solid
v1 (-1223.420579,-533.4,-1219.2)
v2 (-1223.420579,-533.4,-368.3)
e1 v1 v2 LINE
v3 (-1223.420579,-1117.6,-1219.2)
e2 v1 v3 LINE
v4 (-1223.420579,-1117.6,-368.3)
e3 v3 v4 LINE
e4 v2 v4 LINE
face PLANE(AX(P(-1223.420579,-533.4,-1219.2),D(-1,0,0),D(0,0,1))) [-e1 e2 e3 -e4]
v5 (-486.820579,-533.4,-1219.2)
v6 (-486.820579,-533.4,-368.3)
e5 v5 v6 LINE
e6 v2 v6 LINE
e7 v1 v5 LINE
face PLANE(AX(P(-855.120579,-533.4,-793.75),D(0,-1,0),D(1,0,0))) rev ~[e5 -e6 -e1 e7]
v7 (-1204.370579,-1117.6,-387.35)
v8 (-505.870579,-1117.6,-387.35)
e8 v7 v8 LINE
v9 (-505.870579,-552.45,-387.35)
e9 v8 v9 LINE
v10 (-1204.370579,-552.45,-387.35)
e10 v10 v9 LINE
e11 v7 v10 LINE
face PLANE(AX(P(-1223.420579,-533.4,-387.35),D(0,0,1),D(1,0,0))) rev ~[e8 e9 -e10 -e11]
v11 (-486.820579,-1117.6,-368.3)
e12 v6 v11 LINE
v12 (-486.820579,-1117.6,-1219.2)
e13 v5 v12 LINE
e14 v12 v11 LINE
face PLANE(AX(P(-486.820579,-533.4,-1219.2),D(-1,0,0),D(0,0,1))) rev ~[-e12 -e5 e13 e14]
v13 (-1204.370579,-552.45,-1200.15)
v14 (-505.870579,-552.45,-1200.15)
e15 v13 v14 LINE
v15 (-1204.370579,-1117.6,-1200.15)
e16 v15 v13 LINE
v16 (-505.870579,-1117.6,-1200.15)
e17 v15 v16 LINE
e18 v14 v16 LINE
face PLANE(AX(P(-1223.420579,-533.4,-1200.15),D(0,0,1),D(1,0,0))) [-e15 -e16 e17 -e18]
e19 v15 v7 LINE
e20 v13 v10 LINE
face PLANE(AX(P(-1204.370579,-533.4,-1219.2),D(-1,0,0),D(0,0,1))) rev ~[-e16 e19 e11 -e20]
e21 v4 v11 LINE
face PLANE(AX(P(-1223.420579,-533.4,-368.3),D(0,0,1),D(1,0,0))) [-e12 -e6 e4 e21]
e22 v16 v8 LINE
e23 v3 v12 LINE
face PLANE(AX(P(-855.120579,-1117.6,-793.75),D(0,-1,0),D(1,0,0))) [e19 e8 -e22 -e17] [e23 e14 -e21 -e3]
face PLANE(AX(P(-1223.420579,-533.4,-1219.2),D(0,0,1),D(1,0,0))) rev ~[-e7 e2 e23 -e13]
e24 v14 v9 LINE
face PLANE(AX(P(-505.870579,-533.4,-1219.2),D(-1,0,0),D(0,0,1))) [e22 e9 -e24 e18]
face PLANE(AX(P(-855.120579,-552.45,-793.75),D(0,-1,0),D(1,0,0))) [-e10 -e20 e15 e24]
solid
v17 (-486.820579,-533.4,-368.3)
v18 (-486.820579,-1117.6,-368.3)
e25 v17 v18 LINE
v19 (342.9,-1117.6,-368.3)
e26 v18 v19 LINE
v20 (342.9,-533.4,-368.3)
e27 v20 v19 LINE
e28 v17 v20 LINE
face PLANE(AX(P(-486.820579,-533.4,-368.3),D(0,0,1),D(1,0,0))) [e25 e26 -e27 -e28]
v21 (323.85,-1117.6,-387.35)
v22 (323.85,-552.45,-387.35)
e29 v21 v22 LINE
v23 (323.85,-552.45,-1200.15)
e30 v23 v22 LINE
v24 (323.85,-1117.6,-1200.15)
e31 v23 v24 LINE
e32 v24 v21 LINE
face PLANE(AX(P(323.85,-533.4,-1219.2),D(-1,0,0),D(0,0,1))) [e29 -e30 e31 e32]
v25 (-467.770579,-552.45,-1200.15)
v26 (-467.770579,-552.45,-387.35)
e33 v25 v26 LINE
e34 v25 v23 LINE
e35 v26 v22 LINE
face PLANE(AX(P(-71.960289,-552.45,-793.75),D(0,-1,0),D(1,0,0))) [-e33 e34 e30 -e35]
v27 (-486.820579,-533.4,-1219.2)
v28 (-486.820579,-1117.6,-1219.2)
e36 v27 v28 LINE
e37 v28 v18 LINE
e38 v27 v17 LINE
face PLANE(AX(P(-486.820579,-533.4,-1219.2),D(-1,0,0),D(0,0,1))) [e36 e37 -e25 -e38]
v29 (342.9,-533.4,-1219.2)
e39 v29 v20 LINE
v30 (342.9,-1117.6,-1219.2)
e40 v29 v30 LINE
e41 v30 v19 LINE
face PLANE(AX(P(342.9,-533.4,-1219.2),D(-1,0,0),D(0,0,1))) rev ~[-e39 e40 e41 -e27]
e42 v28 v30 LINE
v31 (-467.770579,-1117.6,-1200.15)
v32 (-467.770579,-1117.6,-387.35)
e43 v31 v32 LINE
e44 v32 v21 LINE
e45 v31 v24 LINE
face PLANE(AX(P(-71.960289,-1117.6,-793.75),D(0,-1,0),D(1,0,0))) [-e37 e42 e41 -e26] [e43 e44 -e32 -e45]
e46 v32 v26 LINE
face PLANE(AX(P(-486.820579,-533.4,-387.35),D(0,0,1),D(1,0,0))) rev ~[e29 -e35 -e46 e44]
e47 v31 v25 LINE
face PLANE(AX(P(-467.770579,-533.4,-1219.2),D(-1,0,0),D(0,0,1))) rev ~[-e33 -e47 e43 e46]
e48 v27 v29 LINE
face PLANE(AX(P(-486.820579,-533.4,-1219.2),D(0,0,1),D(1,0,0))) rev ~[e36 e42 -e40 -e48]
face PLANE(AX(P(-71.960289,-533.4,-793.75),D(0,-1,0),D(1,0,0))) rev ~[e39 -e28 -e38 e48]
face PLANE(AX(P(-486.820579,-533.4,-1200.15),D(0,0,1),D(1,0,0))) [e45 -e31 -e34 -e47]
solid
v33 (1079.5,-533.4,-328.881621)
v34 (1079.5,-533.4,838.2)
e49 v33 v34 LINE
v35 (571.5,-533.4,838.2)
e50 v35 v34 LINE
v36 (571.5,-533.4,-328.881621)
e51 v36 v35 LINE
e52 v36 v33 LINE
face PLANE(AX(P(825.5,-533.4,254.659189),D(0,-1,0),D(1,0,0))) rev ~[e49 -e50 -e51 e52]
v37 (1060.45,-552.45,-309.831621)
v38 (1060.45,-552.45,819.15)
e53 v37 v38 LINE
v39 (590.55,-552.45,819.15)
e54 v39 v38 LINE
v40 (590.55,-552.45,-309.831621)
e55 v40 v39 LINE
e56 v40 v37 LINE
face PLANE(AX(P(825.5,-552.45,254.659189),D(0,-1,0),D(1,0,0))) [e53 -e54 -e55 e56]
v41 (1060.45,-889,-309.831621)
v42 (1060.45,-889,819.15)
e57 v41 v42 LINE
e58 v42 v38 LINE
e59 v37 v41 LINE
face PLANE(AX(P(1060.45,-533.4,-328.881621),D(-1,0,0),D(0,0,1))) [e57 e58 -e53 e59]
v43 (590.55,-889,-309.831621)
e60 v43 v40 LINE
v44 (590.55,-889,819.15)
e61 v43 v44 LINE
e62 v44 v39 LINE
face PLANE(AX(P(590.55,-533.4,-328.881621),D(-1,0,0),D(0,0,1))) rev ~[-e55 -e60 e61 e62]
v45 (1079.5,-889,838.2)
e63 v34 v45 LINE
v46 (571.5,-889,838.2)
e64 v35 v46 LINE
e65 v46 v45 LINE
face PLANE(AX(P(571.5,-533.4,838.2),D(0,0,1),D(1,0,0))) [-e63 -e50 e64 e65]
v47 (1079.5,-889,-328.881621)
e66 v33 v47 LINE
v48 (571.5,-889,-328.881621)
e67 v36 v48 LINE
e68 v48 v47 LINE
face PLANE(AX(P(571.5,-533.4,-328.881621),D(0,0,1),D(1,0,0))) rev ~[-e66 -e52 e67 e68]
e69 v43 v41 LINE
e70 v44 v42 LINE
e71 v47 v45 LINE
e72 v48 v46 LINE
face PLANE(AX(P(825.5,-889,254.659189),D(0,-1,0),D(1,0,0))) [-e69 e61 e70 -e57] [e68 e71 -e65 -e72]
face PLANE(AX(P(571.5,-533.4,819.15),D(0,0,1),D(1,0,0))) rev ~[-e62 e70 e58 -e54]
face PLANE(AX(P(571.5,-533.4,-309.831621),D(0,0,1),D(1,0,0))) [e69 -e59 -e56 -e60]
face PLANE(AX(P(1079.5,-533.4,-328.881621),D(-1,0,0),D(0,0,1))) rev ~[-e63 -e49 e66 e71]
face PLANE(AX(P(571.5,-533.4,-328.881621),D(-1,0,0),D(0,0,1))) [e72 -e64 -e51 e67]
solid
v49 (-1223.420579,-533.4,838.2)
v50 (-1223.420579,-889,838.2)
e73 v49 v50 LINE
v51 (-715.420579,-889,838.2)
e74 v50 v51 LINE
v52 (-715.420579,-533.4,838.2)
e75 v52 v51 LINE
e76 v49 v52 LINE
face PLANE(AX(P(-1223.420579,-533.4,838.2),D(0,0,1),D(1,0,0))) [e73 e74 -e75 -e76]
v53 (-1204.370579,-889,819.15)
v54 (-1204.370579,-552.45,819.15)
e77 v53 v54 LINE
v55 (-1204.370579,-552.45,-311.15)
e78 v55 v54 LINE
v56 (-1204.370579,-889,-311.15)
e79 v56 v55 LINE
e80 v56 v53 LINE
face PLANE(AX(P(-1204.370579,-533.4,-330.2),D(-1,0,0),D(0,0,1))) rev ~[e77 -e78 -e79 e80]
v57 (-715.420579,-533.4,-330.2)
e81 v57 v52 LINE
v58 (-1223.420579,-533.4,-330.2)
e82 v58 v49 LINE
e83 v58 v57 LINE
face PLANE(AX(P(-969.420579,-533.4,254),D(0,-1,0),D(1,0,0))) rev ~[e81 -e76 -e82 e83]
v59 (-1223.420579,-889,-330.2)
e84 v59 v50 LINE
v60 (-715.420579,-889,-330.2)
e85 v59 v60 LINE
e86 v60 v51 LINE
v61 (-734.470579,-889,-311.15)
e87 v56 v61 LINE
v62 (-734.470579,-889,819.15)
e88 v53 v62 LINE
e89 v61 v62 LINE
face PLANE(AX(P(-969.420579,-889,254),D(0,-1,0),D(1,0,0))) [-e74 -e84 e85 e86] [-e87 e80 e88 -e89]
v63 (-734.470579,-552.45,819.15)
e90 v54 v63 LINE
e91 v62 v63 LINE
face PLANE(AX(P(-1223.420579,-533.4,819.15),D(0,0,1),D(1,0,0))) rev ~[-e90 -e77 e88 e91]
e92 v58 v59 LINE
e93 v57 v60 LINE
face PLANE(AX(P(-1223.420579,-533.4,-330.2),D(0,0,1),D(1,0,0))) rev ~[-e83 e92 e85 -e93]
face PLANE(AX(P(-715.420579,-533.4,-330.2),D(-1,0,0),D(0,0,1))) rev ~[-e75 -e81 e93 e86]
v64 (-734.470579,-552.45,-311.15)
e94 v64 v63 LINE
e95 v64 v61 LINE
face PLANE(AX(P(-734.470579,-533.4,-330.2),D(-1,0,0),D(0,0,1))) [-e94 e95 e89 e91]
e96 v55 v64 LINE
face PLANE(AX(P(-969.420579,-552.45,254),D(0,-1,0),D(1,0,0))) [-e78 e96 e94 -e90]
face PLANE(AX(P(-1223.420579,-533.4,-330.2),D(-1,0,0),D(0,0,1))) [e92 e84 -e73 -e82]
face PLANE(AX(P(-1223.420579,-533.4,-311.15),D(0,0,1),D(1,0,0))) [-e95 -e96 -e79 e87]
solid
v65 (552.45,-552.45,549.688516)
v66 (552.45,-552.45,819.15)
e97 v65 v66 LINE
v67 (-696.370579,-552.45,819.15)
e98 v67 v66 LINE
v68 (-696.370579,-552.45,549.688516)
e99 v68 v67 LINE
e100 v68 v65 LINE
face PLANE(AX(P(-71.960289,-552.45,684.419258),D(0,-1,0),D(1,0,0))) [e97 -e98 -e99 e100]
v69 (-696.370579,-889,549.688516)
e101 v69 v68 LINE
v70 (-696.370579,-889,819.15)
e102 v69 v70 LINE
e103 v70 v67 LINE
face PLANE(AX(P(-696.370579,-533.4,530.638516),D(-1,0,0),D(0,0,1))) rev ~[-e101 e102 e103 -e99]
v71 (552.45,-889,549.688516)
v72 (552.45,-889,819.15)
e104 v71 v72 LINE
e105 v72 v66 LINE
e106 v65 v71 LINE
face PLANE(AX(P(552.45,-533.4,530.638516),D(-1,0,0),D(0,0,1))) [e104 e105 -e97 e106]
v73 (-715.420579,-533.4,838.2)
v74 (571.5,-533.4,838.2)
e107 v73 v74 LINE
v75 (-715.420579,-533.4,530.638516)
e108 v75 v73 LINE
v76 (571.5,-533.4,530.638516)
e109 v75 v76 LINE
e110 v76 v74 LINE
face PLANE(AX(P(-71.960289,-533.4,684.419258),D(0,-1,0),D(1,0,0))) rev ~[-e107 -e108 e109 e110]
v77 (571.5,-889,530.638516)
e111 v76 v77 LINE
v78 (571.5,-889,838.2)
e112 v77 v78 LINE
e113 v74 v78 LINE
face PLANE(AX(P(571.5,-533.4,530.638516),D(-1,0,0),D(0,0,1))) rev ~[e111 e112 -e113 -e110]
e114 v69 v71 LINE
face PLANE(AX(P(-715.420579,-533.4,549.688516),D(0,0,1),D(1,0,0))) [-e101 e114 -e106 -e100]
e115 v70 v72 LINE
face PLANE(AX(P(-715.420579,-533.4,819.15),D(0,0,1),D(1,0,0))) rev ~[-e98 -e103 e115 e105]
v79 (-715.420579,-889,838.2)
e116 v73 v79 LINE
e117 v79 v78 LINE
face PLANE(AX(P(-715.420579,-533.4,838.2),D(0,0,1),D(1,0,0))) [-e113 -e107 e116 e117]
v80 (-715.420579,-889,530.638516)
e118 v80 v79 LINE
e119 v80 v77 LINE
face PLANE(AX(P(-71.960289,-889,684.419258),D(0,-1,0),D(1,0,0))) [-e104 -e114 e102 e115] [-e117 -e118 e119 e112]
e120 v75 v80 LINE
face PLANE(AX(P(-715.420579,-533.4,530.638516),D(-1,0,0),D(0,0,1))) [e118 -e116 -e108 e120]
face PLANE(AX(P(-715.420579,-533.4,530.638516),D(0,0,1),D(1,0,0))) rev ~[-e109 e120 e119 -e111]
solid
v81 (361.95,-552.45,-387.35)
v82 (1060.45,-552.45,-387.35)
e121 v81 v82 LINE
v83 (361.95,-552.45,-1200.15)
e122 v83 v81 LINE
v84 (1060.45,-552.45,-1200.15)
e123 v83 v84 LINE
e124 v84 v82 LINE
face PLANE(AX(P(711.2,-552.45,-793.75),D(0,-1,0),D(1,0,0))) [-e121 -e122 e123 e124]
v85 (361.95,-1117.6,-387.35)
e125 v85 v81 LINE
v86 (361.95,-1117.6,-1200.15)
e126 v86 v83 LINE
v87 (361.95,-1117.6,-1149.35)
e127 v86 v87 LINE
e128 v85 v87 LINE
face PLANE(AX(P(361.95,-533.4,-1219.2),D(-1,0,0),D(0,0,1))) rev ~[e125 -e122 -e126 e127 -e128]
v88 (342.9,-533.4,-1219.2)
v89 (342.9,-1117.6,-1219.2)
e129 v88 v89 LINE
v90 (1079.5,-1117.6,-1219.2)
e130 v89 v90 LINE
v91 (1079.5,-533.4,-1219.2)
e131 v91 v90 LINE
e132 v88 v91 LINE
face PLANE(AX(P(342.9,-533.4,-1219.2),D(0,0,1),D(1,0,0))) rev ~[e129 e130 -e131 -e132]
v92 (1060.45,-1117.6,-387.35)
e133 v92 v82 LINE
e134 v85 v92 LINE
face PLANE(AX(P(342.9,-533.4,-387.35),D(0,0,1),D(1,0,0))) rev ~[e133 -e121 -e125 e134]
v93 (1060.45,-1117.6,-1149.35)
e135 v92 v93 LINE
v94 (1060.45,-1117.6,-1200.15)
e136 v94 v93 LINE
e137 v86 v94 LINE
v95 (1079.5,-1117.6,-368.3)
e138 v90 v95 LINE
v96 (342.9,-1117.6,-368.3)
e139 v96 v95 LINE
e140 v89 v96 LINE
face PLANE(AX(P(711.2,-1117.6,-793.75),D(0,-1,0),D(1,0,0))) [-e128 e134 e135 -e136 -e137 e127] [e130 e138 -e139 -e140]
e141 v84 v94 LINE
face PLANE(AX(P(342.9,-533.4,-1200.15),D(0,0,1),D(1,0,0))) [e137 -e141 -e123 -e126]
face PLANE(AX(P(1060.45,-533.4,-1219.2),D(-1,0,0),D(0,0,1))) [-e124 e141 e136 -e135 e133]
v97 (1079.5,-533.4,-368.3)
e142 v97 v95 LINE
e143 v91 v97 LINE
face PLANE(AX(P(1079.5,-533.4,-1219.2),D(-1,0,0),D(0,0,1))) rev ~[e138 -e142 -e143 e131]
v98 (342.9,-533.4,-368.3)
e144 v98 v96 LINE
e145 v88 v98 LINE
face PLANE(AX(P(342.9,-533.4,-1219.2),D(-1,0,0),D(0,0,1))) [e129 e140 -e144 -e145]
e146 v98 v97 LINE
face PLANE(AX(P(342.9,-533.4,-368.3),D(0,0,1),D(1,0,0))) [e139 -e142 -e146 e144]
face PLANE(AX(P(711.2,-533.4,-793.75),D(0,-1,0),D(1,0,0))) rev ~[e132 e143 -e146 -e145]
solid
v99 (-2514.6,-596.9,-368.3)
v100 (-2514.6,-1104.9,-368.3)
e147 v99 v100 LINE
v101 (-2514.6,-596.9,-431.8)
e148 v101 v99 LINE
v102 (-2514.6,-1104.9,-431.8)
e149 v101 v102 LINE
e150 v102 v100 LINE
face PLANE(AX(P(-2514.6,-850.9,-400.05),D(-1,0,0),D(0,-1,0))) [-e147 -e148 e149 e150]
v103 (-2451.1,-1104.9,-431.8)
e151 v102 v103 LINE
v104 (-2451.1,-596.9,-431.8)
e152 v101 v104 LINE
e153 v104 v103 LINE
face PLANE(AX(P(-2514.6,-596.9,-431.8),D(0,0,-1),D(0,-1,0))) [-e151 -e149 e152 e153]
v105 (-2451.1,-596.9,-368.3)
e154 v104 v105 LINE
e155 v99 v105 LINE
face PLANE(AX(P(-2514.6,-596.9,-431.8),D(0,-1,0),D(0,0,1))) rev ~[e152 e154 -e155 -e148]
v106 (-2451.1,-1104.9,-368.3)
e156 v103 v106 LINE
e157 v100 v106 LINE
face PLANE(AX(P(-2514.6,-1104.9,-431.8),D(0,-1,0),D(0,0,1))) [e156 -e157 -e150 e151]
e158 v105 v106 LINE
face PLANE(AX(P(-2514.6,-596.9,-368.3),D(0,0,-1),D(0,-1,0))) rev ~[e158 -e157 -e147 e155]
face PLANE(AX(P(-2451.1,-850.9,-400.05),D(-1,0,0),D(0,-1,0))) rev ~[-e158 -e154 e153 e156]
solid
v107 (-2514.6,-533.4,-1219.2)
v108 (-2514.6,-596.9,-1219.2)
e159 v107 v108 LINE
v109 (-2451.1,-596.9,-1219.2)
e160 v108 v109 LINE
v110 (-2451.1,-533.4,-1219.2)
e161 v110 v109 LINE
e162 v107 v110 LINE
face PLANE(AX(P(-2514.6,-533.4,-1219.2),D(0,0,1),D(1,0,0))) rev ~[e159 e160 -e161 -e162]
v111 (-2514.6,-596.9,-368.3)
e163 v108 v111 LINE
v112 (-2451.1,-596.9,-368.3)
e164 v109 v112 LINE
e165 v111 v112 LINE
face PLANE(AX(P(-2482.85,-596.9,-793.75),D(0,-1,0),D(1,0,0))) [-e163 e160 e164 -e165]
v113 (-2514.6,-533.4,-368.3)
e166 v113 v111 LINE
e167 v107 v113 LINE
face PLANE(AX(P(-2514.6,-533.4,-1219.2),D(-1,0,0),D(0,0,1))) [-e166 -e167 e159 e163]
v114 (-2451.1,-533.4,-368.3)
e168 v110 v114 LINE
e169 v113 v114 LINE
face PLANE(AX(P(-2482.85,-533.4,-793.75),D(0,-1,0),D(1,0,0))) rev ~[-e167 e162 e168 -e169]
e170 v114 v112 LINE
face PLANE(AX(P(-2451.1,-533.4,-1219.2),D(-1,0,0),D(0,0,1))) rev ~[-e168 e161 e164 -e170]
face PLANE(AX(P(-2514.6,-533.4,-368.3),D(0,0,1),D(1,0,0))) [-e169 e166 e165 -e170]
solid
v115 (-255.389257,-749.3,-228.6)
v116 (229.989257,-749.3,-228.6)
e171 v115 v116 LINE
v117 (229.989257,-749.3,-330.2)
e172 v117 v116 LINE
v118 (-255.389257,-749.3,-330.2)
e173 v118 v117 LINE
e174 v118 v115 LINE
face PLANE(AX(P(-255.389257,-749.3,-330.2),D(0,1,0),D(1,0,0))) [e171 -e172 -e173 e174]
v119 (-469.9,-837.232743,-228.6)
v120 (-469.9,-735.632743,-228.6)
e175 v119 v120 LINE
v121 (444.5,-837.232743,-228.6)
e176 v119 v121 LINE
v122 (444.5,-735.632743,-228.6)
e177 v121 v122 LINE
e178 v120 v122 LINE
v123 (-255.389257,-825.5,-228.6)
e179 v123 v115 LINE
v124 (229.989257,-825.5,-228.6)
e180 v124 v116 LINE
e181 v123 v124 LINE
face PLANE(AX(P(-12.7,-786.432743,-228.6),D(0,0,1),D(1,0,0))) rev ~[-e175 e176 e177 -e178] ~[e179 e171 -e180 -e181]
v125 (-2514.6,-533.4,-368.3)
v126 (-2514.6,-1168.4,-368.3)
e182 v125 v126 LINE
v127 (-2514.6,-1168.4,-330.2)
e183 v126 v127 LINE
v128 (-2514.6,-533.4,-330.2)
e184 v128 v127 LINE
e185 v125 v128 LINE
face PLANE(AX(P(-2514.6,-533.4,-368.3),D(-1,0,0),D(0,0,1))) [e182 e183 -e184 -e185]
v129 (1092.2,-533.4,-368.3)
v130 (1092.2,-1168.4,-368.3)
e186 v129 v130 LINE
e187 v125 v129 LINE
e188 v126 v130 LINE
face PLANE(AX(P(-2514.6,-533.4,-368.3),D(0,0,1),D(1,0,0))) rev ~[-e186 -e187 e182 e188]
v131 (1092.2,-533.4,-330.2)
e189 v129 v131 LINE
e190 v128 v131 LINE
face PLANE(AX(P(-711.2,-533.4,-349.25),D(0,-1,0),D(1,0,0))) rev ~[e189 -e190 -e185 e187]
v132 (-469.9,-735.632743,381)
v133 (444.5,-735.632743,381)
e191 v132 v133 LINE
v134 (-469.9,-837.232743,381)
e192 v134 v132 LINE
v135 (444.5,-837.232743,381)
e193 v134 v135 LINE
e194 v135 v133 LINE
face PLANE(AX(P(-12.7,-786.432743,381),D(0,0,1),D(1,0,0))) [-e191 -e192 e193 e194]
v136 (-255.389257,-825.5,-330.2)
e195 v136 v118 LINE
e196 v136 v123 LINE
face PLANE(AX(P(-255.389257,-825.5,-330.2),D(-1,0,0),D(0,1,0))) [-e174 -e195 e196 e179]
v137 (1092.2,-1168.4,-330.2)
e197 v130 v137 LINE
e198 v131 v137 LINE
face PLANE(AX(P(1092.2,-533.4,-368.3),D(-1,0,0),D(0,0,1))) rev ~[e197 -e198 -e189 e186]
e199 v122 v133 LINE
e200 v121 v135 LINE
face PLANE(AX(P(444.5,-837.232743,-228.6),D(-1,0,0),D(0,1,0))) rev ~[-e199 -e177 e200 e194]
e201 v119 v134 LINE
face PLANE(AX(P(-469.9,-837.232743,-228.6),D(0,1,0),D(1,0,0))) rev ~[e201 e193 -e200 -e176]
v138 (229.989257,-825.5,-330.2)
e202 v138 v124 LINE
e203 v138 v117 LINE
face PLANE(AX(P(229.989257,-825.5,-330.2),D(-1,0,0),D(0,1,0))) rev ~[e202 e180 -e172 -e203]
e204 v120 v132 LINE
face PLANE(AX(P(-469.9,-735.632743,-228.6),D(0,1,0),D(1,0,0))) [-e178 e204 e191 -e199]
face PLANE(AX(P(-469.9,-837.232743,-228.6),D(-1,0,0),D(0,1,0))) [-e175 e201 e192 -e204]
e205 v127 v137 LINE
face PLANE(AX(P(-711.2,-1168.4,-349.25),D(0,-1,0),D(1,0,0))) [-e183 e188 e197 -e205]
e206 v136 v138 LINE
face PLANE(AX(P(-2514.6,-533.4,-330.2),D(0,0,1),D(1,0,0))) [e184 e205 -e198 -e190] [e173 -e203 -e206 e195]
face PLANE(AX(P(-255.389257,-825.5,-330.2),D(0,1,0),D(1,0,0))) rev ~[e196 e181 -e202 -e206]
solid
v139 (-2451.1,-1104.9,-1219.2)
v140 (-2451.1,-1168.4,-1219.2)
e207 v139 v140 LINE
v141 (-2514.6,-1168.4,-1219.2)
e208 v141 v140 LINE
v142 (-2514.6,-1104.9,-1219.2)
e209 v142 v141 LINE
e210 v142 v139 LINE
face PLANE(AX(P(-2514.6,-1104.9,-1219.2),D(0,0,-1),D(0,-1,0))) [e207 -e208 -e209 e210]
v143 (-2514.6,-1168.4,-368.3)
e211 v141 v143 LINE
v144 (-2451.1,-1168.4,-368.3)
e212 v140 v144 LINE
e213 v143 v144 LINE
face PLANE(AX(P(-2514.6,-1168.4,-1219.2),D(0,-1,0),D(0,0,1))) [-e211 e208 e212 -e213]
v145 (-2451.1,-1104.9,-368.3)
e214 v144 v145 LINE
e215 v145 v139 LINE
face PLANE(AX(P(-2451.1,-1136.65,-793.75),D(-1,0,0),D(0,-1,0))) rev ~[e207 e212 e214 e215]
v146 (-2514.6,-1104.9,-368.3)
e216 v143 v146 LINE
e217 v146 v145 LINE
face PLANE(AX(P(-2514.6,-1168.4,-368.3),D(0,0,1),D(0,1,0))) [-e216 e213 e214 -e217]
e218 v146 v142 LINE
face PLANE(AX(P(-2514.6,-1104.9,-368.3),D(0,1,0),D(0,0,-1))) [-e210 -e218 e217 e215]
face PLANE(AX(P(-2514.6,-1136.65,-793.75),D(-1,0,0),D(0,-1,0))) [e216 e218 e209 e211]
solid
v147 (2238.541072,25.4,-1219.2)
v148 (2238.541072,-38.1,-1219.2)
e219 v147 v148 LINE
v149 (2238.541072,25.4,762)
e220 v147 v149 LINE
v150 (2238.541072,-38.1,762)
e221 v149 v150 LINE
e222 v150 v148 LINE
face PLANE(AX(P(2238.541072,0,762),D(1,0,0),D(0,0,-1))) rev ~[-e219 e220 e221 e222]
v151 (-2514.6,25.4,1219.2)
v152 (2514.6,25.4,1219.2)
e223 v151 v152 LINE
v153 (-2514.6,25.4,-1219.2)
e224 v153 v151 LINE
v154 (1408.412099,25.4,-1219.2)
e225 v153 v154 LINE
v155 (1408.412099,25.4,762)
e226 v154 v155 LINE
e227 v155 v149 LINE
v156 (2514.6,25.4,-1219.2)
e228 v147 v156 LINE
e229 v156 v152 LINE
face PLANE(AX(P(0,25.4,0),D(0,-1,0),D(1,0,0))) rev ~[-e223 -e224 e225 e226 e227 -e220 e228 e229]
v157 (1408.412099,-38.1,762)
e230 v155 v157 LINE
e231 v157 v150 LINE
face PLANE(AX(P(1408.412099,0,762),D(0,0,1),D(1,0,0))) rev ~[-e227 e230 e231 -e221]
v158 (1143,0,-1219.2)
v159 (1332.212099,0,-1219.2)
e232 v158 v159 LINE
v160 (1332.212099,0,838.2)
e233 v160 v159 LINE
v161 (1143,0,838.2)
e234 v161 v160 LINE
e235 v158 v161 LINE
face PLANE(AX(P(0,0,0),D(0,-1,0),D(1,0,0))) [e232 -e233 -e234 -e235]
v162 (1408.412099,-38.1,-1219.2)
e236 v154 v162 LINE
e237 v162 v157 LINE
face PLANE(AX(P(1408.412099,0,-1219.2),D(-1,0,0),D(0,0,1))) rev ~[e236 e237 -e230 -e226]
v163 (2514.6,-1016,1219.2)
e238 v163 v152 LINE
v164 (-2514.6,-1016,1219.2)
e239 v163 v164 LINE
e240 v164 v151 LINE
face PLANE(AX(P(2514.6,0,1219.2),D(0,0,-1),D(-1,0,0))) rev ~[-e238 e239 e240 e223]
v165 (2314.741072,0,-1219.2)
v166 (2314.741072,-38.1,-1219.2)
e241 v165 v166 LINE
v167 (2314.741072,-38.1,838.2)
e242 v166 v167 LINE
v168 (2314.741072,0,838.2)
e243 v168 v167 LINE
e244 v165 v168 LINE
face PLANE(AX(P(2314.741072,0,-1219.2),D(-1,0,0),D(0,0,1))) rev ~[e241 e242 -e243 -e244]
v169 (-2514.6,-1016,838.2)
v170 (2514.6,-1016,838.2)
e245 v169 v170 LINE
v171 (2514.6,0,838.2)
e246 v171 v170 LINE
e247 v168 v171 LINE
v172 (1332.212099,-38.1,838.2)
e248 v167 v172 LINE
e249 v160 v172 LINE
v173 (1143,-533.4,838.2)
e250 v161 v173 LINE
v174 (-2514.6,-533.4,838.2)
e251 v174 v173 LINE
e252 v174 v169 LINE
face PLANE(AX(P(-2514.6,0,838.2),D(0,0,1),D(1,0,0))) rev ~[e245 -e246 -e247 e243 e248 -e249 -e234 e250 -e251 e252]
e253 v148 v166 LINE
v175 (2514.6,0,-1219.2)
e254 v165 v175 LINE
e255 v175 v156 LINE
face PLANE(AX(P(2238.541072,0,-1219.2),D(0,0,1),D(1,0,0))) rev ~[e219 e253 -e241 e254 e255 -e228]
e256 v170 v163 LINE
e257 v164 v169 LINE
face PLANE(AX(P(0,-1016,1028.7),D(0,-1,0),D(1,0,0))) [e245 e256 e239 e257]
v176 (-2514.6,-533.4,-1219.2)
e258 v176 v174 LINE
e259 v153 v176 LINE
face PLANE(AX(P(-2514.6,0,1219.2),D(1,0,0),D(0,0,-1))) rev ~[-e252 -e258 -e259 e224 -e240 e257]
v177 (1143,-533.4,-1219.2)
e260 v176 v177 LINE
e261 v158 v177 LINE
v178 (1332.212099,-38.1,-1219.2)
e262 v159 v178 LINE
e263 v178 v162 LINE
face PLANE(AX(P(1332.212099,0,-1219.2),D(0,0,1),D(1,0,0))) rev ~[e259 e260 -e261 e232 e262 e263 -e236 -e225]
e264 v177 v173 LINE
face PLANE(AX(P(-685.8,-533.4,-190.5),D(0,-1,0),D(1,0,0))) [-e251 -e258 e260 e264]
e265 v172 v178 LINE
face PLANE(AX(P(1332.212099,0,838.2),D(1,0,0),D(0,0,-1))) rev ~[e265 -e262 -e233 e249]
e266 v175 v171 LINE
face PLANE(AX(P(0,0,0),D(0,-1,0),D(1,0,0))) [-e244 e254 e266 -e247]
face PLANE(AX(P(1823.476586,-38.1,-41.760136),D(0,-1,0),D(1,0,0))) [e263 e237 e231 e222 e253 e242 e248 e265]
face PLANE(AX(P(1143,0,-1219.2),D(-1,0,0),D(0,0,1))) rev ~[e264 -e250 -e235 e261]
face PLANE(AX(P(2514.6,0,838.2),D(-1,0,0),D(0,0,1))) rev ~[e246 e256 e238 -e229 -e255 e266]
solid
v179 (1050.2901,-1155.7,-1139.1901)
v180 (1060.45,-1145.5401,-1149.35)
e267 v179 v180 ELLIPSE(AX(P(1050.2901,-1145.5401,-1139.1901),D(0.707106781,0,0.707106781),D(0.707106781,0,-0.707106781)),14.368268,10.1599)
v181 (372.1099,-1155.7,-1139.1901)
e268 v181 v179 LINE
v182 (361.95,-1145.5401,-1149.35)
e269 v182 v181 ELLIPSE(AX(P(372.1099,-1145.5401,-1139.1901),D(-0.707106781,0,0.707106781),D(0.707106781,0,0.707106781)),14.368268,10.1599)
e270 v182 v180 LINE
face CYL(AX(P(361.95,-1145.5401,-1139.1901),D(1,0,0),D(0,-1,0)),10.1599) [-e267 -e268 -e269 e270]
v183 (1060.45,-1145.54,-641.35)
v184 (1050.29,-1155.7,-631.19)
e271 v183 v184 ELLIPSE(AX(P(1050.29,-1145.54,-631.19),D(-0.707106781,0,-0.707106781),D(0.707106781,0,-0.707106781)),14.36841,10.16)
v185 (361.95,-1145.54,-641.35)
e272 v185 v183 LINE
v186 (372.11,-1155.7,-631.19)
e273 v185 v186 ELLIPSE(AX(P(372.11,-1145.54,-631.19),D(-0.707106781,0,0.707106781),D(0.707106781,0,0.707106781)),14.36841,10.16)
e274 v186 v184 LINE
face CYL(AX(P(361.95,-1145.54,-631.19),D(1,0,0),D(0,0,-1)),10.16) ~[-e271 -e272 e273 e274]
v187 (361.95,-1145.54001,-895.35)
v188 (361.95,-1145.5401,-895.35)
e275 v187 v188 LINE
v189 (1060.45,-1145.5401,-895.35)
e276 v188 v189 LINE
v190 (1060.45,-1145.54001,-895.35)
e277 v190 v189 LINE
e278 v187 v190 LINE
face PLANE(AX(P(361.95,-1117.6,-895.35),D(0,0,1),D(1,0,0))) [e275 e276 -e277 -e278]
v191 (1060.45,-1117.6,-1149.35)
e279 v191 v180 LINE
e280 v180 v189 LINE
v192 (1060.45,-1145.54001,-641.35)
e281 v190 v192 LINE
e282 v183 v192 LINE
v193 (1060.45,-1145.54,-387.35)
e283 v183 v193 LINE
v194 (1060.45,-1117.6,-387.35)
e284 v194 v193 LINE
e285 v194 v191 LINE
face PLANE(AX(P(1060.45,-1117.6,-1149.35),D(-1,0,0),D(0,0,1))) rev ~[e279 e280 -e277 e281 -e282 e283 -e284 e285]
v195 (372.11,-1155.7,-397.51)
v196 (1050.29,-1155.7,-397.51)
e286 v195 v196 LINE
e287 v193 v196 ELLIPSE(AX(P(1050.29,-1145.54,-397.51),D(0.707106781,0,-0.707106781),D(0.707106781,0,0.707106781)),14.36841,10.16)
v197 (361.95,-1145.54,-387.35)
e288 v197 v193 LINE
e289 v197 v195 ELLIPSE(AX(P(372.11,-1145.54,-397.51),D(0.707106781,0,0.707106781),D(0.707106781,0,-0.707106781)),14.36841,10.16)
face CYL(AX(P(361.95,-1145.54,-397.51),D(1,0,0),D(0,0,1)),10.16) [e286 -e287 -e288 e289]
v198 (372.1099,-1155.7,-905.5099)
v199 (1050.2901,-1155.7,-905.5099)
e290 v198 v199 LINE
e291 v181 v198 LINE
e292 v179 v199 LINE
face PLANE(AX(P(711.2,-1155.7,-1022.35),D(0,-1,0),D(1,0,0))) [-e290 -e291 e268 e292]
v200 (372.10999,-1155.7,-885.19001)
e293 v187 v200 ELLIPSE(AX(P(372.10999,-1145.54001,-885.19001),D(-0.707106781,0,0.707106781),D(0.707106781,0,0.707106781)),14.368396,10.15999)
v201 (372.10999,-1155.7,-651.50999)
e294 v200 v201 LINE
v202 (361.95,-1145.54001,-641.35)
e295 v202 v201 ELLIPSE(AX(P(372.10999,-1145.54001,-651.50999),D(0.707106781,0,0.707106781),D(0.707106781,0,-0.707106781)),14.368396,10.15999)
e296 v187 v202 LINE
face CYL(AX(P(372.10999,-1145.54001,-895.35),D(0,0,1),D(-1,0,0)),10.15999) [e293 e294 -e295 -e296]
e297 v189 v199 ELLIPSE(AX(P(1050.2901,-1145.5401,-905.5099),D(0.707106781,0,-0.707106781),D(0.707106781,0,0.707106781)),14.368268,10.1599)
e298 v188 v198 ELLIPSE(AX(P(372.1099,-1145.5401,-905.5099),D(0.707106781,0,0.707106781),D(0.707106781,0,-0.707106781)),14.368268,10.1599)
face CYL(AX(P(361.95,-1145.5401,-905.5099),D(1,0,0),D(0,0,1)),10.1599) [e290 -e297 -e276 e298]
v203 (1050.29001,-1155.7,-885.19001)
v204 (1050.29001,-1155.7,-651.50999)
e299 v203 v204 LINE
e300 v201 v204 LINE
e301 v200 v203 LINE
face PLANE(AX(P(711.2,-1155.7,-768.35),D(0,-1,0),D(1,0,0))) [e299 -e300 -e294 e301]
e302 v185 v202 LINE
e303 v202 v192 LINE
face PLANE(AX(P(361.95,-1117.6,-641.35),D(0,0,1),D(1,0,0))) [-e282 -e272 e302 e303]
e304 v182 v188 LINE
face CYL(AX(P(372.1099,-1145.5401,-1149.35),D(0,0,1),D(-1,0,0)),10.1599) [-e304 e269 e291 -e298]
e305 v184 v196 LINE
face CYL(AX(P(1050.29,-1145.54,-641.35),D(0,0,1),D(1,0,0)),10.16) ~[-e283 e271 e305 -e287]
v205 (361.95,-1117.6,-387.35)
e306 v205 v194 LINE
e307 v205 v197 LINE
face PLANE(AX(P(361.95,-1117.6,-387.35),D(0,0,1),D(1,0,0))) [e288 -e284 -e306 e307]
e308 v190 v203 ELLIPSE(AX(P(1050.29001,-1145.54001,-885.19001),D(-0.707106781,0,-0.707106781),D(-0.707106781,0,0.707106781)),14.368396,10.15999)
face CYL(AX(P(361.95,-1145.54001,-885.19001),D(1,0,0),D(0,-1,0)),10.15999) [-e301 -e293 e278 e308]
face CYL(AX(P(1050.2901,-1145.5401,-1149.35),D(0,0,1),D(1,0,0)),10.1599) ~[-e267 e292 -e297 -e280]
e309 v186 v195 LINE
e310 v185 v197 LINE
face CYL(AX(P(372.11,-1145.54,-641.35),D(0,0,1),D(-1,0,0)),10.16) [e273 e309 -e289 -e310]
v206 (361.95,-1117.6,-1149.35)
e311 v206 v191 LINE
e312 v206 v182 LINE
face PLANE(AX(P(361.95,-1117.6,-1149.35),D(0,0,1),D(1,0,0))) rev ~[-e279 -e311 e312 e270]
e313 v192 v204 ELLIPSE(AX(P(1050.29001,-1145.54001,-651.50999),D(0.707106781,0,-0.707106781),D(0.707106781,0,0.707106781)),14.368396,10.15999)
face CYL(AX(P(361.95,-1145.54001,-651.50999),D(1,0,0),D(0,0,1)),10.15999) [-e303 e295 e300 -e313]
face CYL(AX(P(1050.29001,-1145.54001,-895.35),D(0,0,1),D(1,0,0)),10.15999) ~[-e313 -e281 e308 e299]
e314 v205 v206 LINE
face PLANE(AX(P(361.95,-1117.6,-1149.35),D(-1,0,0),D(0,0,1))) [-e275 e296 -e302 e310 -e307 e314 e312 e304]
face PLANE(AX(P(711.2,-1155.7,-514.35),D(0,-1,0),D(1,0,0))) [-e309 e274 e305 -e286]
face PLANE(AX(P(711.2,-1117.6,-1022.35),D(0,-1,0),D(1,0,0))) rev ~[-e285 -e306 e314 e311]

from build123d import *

# Parameters (mm, degrees)
F0_W      = 5029.2
F0_H      = 2438.4
F1_DEPTH  = 25.4
F2_W      = 3657.6
F2_H      = 2057.4
F3_DEPTH  = 533.4
F5_DEPTH  = 1016
F6_W      = 830.1289733465
F6_H      = 1981.2
F7_DEPTH  = 25.4
F9_DEPTH  = 38.1
F10_W     = 3606.8
F10_H     = 38.1
F11_DEPTH = 635
F12_W     = 63.5
F12_H     = 850.9
F13_DEPTH = 63.5
F14_W     = 508
F14_H     = 63.5
F15_DEPTH = 63.5
F17_DEPTH = 63.5
F18_W     = 736.6
F18_H     = 850.9
F19_DEPTH = 584.2
F20_T     = -19.05
F21_W     = 829.7205785751
F21_H     = 850.9
F22_DEPTH = 584.2
F23_T     = -19.05
F24_W     = 736.6
F24_H     = 850.9
F25_DEPTH = 584.2
F26_T     = -19.05
F27_W     = 698.5
F27_H     = 254
F28_DEPTH = 38.1
F29_W     = 485.3785143141
F29_H     = 76.2
F30_DEPTH = 101.6
F31_W     = 914.4
F31_H     = 101.6
F32_DEPTH = 609.6
F33_W     = 508
F33_H     = 1167.0816213608
F34_DEPTH = 355.6
F35_T     = -19.05
F36_W     = 508
F36_H     = 1168.4
F37_DEPTH = 355.6
F38_T     = -19.05
F39_W     = 1286.9205785751
F39_H     = 307.5614840508
F40_DEPTH = 355.6
F41_T     = -19.05
F42_R     = 10.16
F43_W     = 698.5
F43_H     = 254
F44_DEPTH = 38.1
F45_R     = 10.15999
F46_W     = 698.5
F46_H     = 254
F47_DEPTH = 38.1
F48_R     = 10.1599


# Not quite as in the source:
# - a fillet or chamfer is up to 0.001 mm smaller than in the source, because OpenCascade refuses the exact size


with BuildPart() as f1:
    # F0 (on Front) → F1 (new body)
    with BuildSketch(Plane.XZ):
        Rectangle(F0_W, F0_H)
    extrude(amount=-F1_DEPTH)

    # F2 (on face) → F3 (join)
    with BuildSketch(Plane.XZ):
        with Locations((-685.8, -190.5)):
            Rectangle(F2_W, F2_H)
    extrude(amount=F3_DEPTH)

    # F4 (on face) → F5 (join)
    with BuildSketch(Plane.XZ):
        Polygon((-2514.6, 1219.2), (-2514.6, 838.2), (1143, 838.2), (2514.6, 838.2), (2514.6, 1219.2), align=None)
    extrude(amount=F5_DEPTH)

    # F6 (on face) → F7 (cut)
    with BuildSketch(Plane.XZ):
        with Locations((1823.4765855578, -228.6)):
            Rectangle(F6_W, F6_H)
    extrude(amount=-F7_DEPTH, mode=Mode.SUBTRACT)

    # F8 (on face) → F9 (join)
    with BuildSketch(Plane.XZ):
        Polygon((2314.7410722311, 838.2), (1332.2120988846, 838.2), (1332.2120988846, -1219.2), (1408.4120988846, -1219.2), (1408.4120988846, 762), (2238.5410722311, 762), (2238.5410722311, -1219.2), (2314.7410722311, -1219.2), align=None)
    extrude(amount=F9_DEPTH)


with BuildPart() as f11:
    # F10 (on face) → F11 (new body)
    with BuildSketch(Plane.XZ.offset(533.4)):
        with Locations((-711.2, -349.25)):
            Rectangle(F10_W, F10_H)
    extrude(amount=F11_DEPTH)

    # F29 (on face) → F30 (join)
    with BuildSketch(Plane.XY.offset(-330.2)):
        with Locations((-12.7, -787.4)):
            Rectangle(F29_W, F29_H)
    extrude(amount=F30_DEPTH)

    # F31 (on face) → F32 (join)
    with BuildSketch(Plane.XY.offset(-228.6)):
        with Locations((-12.7, -786.4327430725)):
            Rectangle(F31_W, F31_H)
    extrude(amount=F32_DEPTH)


with BuildPart() as f13:
    # F12 (on face) → F13 (new body)
    with BuildSketch(Plane.XZ.offset(533.4)):
        with Locations((-2482.85, -793.75)):
            Rectangle(F12_W, F12_H)
    extrude(amount=F13_DEPTH)


with BuildPart() as f15:
    # F14 (on face) → F15 (new body)
    with BuildSketch(Plane(origin=(-2514.6, 0, 0), x_dir=(0, -1, 0), z_dir=(-1, 0, 0))):
        with Locations((850.9, -400.05)):
            Rectangle(F14_W, F14_H)
    extrude(amount=-F15_DEPTH)


with BuildPart() as f17:
    # F16 (on face) → F17 (new body)
    with BuildSketch(Plane(origin=(-2514.6, 0, 0), x_dir=(0, -1, 0), z_dir=(-1, 0, 0))):
        Polygon((1168.4, -368.3), (1104.9, -368.3), (1104.9, -431.8), (1104.9, -1219.2), (1168.4, -1219.2), align=None)
    extrude(amount=-F17_DEPTH)


with BuildPart() as f19:
    # F18 (on face) → F19 (new body)
    with BuildSketch(Plane.XZ.offset(533.4)):
        with Locations((711.2, -793.75)):
            Rectangle(F18_W, F18_H)
    extrude(amount=F19_DEPTH)

    # F20
    f20_openings = [f19.faces().sort_by_distance(p)[0] for p in [
        (711.2, -1117.6, -793.75),
    ]]
    offset(amount=F20_T, openings=f20_openings)



with BuildPart() as f22:
    # F21 (on face) → F22 (new body)
    with BuildSketch(Plane.XZ.offset(533.4)):
        with Locations((-71.9602892876, -793.75)):
            Rectangle(F21_W, F21_H)
    extrude(amount=F22_DEPTH)

    # F23
    f23_openings = [f22.faces().sort_by_distance(p)[0] for p in [
        (-71.960289, -1117.6, -793.75),
    ]]
    offset(amount=F23_T, openings=f23_openings)


with BuildPart() as f25:
    # F24 (on face) → F25 (new body)
    with BuildSketch(Plane.XZ.offset(533.4)):
        with Locations((-855.1205785751, -793.75)):
            Rectangle(F24_W, F24_H)
    extrude(amount=F25_DEPTH)

    # F26
    f26_openings = [f25.faces().sort_by_distance(p)[0] for p in [
        (-855.120579, -1117.6, -793.75),
    ]]
    offset(amount=F26_T, openings=f26_openings)


with BuildPart() as f28:
    # F27 (on face) → F28 (new body)
    with BuildSketch(Plane.XZ.offset(1117.6)):
        with Locations((711.2, -514.35)):
            Rectangle(F27_W, F27_H)
    extrude(amount=F28_DEPTH)

    # F42
    f42_edges = [f28.edges().sort_by_distance(p)[0] for p in [
        (711.2, -1155.7, -387.35),
        (361.95, -1155.7, -514.35),
        (711.2, -1155.7, -641.35),
        (1060.45, -1155.7, -514.35),
    ]]
    fillet(f42_edges, radius=F42_R)


with BuildPart() as f34:
    # F33 (on face) → F34 (new body)
    with BuildSketch(Plane.XZ.offset(533.4)):
        with Locations((825.5, 254.6591893196)):
            Rectangle(F33_W, F33_H)
    extrude(amount=F34_DEPTH)

    # F35
    f35_openings = [f34.faces().sort_by_distance(p)[0] for p in [
        (825.5, -889, 254.659189),
    ]]
    offset(amount=F35_T, openings=f35_openings)


with BuildPart() as f37:
    # F36 (on face) → F37 (new body)
    with BuildSketch(Plane.XZ.offset(533.4)):
        with Locations((-969.4205785751, 254)):
            Rectangle(F36_W, F36_H)
    extrude(amount=F37_DEPTH)

    # F38
    f38_openings = [f37.faces().sort_by_distance(p)[0] for p in [
        (-969.420579, -889, 254),
    ]]
    offset(amount=F38_T, openings=f38_openings)


with BuildPart() as f40:
    # F39 (on face) → F40 (new body)
    with BuildSketch(Plane.XZ.offset(533.4)):
        with Locations((-71.9602892876, 684.4192579746)):
            Rectangle(F39_W, F39_H)
    extrude(amount=F40_DEPTH)

    # F41
    f41_openings = [f40.faces().sort_by_distance(p)[0] for p in [
        (-71.960289, -889, 684.419258),
    ]]
    offset(amount=F41_T, openings=f41_openings)


with BuildPart() as f19_1:
    add(f19.part)

    add(f28.part)  # F44 merges F28
    # F43 (on face) → F44 (join)
    with BuildSketch(Plane.XZ.offset(1117.6)):
        with Locations((711.2, -768.35)):
            Rectangle(F43_W, F43_H)
    extrude(amount=F44_DEPTH)

    # F45 (radius 10.16 in the source; OpenCascade refuses exactly that, so slightly less here)
    f45_edges = [f19_1.edges().sort_by_distance(p)[0] for p in [
        (1060.45, -1155.7, -768.35),
        (711.2, -1155.7, -641.35),
        (361.95, -1155.7, -768.35),
        (711.2, -1155.7, -895.35),
    ]]
    fillet(f45_edges, radius=F45_R)

    # F46 (on face) → F47 (join)
    with BuildSketch(Plane.XZ.offset(1117.6)):
        with Locations((711.2, -1022.35)):
            Rectangle(F46_W, F46_H)
    extrude(amount=F47_DEPTH)

    # F48 (radius 10.16 in the source; OpenCascade refuses exactly that, so slightly less here)
    f48_edges = [f19_1.edges().sort_by_distance(p)[0] for p in [
        (711.2, -1155.7, -895.35),
        (361.95, -1155.7, -1022.35),
        (711.2, -1155.7, -1149.35),
        (1060.45, -1155.7, -1022.35),
    ]]
    fillet(f48_edges, radius=F48_R)


solid = Compound([f1.part, f11.part, f13.part, f15.part, f17.part, f22.part, f25.part, f34.part, f37.part, f40.part, f19_1.part])
